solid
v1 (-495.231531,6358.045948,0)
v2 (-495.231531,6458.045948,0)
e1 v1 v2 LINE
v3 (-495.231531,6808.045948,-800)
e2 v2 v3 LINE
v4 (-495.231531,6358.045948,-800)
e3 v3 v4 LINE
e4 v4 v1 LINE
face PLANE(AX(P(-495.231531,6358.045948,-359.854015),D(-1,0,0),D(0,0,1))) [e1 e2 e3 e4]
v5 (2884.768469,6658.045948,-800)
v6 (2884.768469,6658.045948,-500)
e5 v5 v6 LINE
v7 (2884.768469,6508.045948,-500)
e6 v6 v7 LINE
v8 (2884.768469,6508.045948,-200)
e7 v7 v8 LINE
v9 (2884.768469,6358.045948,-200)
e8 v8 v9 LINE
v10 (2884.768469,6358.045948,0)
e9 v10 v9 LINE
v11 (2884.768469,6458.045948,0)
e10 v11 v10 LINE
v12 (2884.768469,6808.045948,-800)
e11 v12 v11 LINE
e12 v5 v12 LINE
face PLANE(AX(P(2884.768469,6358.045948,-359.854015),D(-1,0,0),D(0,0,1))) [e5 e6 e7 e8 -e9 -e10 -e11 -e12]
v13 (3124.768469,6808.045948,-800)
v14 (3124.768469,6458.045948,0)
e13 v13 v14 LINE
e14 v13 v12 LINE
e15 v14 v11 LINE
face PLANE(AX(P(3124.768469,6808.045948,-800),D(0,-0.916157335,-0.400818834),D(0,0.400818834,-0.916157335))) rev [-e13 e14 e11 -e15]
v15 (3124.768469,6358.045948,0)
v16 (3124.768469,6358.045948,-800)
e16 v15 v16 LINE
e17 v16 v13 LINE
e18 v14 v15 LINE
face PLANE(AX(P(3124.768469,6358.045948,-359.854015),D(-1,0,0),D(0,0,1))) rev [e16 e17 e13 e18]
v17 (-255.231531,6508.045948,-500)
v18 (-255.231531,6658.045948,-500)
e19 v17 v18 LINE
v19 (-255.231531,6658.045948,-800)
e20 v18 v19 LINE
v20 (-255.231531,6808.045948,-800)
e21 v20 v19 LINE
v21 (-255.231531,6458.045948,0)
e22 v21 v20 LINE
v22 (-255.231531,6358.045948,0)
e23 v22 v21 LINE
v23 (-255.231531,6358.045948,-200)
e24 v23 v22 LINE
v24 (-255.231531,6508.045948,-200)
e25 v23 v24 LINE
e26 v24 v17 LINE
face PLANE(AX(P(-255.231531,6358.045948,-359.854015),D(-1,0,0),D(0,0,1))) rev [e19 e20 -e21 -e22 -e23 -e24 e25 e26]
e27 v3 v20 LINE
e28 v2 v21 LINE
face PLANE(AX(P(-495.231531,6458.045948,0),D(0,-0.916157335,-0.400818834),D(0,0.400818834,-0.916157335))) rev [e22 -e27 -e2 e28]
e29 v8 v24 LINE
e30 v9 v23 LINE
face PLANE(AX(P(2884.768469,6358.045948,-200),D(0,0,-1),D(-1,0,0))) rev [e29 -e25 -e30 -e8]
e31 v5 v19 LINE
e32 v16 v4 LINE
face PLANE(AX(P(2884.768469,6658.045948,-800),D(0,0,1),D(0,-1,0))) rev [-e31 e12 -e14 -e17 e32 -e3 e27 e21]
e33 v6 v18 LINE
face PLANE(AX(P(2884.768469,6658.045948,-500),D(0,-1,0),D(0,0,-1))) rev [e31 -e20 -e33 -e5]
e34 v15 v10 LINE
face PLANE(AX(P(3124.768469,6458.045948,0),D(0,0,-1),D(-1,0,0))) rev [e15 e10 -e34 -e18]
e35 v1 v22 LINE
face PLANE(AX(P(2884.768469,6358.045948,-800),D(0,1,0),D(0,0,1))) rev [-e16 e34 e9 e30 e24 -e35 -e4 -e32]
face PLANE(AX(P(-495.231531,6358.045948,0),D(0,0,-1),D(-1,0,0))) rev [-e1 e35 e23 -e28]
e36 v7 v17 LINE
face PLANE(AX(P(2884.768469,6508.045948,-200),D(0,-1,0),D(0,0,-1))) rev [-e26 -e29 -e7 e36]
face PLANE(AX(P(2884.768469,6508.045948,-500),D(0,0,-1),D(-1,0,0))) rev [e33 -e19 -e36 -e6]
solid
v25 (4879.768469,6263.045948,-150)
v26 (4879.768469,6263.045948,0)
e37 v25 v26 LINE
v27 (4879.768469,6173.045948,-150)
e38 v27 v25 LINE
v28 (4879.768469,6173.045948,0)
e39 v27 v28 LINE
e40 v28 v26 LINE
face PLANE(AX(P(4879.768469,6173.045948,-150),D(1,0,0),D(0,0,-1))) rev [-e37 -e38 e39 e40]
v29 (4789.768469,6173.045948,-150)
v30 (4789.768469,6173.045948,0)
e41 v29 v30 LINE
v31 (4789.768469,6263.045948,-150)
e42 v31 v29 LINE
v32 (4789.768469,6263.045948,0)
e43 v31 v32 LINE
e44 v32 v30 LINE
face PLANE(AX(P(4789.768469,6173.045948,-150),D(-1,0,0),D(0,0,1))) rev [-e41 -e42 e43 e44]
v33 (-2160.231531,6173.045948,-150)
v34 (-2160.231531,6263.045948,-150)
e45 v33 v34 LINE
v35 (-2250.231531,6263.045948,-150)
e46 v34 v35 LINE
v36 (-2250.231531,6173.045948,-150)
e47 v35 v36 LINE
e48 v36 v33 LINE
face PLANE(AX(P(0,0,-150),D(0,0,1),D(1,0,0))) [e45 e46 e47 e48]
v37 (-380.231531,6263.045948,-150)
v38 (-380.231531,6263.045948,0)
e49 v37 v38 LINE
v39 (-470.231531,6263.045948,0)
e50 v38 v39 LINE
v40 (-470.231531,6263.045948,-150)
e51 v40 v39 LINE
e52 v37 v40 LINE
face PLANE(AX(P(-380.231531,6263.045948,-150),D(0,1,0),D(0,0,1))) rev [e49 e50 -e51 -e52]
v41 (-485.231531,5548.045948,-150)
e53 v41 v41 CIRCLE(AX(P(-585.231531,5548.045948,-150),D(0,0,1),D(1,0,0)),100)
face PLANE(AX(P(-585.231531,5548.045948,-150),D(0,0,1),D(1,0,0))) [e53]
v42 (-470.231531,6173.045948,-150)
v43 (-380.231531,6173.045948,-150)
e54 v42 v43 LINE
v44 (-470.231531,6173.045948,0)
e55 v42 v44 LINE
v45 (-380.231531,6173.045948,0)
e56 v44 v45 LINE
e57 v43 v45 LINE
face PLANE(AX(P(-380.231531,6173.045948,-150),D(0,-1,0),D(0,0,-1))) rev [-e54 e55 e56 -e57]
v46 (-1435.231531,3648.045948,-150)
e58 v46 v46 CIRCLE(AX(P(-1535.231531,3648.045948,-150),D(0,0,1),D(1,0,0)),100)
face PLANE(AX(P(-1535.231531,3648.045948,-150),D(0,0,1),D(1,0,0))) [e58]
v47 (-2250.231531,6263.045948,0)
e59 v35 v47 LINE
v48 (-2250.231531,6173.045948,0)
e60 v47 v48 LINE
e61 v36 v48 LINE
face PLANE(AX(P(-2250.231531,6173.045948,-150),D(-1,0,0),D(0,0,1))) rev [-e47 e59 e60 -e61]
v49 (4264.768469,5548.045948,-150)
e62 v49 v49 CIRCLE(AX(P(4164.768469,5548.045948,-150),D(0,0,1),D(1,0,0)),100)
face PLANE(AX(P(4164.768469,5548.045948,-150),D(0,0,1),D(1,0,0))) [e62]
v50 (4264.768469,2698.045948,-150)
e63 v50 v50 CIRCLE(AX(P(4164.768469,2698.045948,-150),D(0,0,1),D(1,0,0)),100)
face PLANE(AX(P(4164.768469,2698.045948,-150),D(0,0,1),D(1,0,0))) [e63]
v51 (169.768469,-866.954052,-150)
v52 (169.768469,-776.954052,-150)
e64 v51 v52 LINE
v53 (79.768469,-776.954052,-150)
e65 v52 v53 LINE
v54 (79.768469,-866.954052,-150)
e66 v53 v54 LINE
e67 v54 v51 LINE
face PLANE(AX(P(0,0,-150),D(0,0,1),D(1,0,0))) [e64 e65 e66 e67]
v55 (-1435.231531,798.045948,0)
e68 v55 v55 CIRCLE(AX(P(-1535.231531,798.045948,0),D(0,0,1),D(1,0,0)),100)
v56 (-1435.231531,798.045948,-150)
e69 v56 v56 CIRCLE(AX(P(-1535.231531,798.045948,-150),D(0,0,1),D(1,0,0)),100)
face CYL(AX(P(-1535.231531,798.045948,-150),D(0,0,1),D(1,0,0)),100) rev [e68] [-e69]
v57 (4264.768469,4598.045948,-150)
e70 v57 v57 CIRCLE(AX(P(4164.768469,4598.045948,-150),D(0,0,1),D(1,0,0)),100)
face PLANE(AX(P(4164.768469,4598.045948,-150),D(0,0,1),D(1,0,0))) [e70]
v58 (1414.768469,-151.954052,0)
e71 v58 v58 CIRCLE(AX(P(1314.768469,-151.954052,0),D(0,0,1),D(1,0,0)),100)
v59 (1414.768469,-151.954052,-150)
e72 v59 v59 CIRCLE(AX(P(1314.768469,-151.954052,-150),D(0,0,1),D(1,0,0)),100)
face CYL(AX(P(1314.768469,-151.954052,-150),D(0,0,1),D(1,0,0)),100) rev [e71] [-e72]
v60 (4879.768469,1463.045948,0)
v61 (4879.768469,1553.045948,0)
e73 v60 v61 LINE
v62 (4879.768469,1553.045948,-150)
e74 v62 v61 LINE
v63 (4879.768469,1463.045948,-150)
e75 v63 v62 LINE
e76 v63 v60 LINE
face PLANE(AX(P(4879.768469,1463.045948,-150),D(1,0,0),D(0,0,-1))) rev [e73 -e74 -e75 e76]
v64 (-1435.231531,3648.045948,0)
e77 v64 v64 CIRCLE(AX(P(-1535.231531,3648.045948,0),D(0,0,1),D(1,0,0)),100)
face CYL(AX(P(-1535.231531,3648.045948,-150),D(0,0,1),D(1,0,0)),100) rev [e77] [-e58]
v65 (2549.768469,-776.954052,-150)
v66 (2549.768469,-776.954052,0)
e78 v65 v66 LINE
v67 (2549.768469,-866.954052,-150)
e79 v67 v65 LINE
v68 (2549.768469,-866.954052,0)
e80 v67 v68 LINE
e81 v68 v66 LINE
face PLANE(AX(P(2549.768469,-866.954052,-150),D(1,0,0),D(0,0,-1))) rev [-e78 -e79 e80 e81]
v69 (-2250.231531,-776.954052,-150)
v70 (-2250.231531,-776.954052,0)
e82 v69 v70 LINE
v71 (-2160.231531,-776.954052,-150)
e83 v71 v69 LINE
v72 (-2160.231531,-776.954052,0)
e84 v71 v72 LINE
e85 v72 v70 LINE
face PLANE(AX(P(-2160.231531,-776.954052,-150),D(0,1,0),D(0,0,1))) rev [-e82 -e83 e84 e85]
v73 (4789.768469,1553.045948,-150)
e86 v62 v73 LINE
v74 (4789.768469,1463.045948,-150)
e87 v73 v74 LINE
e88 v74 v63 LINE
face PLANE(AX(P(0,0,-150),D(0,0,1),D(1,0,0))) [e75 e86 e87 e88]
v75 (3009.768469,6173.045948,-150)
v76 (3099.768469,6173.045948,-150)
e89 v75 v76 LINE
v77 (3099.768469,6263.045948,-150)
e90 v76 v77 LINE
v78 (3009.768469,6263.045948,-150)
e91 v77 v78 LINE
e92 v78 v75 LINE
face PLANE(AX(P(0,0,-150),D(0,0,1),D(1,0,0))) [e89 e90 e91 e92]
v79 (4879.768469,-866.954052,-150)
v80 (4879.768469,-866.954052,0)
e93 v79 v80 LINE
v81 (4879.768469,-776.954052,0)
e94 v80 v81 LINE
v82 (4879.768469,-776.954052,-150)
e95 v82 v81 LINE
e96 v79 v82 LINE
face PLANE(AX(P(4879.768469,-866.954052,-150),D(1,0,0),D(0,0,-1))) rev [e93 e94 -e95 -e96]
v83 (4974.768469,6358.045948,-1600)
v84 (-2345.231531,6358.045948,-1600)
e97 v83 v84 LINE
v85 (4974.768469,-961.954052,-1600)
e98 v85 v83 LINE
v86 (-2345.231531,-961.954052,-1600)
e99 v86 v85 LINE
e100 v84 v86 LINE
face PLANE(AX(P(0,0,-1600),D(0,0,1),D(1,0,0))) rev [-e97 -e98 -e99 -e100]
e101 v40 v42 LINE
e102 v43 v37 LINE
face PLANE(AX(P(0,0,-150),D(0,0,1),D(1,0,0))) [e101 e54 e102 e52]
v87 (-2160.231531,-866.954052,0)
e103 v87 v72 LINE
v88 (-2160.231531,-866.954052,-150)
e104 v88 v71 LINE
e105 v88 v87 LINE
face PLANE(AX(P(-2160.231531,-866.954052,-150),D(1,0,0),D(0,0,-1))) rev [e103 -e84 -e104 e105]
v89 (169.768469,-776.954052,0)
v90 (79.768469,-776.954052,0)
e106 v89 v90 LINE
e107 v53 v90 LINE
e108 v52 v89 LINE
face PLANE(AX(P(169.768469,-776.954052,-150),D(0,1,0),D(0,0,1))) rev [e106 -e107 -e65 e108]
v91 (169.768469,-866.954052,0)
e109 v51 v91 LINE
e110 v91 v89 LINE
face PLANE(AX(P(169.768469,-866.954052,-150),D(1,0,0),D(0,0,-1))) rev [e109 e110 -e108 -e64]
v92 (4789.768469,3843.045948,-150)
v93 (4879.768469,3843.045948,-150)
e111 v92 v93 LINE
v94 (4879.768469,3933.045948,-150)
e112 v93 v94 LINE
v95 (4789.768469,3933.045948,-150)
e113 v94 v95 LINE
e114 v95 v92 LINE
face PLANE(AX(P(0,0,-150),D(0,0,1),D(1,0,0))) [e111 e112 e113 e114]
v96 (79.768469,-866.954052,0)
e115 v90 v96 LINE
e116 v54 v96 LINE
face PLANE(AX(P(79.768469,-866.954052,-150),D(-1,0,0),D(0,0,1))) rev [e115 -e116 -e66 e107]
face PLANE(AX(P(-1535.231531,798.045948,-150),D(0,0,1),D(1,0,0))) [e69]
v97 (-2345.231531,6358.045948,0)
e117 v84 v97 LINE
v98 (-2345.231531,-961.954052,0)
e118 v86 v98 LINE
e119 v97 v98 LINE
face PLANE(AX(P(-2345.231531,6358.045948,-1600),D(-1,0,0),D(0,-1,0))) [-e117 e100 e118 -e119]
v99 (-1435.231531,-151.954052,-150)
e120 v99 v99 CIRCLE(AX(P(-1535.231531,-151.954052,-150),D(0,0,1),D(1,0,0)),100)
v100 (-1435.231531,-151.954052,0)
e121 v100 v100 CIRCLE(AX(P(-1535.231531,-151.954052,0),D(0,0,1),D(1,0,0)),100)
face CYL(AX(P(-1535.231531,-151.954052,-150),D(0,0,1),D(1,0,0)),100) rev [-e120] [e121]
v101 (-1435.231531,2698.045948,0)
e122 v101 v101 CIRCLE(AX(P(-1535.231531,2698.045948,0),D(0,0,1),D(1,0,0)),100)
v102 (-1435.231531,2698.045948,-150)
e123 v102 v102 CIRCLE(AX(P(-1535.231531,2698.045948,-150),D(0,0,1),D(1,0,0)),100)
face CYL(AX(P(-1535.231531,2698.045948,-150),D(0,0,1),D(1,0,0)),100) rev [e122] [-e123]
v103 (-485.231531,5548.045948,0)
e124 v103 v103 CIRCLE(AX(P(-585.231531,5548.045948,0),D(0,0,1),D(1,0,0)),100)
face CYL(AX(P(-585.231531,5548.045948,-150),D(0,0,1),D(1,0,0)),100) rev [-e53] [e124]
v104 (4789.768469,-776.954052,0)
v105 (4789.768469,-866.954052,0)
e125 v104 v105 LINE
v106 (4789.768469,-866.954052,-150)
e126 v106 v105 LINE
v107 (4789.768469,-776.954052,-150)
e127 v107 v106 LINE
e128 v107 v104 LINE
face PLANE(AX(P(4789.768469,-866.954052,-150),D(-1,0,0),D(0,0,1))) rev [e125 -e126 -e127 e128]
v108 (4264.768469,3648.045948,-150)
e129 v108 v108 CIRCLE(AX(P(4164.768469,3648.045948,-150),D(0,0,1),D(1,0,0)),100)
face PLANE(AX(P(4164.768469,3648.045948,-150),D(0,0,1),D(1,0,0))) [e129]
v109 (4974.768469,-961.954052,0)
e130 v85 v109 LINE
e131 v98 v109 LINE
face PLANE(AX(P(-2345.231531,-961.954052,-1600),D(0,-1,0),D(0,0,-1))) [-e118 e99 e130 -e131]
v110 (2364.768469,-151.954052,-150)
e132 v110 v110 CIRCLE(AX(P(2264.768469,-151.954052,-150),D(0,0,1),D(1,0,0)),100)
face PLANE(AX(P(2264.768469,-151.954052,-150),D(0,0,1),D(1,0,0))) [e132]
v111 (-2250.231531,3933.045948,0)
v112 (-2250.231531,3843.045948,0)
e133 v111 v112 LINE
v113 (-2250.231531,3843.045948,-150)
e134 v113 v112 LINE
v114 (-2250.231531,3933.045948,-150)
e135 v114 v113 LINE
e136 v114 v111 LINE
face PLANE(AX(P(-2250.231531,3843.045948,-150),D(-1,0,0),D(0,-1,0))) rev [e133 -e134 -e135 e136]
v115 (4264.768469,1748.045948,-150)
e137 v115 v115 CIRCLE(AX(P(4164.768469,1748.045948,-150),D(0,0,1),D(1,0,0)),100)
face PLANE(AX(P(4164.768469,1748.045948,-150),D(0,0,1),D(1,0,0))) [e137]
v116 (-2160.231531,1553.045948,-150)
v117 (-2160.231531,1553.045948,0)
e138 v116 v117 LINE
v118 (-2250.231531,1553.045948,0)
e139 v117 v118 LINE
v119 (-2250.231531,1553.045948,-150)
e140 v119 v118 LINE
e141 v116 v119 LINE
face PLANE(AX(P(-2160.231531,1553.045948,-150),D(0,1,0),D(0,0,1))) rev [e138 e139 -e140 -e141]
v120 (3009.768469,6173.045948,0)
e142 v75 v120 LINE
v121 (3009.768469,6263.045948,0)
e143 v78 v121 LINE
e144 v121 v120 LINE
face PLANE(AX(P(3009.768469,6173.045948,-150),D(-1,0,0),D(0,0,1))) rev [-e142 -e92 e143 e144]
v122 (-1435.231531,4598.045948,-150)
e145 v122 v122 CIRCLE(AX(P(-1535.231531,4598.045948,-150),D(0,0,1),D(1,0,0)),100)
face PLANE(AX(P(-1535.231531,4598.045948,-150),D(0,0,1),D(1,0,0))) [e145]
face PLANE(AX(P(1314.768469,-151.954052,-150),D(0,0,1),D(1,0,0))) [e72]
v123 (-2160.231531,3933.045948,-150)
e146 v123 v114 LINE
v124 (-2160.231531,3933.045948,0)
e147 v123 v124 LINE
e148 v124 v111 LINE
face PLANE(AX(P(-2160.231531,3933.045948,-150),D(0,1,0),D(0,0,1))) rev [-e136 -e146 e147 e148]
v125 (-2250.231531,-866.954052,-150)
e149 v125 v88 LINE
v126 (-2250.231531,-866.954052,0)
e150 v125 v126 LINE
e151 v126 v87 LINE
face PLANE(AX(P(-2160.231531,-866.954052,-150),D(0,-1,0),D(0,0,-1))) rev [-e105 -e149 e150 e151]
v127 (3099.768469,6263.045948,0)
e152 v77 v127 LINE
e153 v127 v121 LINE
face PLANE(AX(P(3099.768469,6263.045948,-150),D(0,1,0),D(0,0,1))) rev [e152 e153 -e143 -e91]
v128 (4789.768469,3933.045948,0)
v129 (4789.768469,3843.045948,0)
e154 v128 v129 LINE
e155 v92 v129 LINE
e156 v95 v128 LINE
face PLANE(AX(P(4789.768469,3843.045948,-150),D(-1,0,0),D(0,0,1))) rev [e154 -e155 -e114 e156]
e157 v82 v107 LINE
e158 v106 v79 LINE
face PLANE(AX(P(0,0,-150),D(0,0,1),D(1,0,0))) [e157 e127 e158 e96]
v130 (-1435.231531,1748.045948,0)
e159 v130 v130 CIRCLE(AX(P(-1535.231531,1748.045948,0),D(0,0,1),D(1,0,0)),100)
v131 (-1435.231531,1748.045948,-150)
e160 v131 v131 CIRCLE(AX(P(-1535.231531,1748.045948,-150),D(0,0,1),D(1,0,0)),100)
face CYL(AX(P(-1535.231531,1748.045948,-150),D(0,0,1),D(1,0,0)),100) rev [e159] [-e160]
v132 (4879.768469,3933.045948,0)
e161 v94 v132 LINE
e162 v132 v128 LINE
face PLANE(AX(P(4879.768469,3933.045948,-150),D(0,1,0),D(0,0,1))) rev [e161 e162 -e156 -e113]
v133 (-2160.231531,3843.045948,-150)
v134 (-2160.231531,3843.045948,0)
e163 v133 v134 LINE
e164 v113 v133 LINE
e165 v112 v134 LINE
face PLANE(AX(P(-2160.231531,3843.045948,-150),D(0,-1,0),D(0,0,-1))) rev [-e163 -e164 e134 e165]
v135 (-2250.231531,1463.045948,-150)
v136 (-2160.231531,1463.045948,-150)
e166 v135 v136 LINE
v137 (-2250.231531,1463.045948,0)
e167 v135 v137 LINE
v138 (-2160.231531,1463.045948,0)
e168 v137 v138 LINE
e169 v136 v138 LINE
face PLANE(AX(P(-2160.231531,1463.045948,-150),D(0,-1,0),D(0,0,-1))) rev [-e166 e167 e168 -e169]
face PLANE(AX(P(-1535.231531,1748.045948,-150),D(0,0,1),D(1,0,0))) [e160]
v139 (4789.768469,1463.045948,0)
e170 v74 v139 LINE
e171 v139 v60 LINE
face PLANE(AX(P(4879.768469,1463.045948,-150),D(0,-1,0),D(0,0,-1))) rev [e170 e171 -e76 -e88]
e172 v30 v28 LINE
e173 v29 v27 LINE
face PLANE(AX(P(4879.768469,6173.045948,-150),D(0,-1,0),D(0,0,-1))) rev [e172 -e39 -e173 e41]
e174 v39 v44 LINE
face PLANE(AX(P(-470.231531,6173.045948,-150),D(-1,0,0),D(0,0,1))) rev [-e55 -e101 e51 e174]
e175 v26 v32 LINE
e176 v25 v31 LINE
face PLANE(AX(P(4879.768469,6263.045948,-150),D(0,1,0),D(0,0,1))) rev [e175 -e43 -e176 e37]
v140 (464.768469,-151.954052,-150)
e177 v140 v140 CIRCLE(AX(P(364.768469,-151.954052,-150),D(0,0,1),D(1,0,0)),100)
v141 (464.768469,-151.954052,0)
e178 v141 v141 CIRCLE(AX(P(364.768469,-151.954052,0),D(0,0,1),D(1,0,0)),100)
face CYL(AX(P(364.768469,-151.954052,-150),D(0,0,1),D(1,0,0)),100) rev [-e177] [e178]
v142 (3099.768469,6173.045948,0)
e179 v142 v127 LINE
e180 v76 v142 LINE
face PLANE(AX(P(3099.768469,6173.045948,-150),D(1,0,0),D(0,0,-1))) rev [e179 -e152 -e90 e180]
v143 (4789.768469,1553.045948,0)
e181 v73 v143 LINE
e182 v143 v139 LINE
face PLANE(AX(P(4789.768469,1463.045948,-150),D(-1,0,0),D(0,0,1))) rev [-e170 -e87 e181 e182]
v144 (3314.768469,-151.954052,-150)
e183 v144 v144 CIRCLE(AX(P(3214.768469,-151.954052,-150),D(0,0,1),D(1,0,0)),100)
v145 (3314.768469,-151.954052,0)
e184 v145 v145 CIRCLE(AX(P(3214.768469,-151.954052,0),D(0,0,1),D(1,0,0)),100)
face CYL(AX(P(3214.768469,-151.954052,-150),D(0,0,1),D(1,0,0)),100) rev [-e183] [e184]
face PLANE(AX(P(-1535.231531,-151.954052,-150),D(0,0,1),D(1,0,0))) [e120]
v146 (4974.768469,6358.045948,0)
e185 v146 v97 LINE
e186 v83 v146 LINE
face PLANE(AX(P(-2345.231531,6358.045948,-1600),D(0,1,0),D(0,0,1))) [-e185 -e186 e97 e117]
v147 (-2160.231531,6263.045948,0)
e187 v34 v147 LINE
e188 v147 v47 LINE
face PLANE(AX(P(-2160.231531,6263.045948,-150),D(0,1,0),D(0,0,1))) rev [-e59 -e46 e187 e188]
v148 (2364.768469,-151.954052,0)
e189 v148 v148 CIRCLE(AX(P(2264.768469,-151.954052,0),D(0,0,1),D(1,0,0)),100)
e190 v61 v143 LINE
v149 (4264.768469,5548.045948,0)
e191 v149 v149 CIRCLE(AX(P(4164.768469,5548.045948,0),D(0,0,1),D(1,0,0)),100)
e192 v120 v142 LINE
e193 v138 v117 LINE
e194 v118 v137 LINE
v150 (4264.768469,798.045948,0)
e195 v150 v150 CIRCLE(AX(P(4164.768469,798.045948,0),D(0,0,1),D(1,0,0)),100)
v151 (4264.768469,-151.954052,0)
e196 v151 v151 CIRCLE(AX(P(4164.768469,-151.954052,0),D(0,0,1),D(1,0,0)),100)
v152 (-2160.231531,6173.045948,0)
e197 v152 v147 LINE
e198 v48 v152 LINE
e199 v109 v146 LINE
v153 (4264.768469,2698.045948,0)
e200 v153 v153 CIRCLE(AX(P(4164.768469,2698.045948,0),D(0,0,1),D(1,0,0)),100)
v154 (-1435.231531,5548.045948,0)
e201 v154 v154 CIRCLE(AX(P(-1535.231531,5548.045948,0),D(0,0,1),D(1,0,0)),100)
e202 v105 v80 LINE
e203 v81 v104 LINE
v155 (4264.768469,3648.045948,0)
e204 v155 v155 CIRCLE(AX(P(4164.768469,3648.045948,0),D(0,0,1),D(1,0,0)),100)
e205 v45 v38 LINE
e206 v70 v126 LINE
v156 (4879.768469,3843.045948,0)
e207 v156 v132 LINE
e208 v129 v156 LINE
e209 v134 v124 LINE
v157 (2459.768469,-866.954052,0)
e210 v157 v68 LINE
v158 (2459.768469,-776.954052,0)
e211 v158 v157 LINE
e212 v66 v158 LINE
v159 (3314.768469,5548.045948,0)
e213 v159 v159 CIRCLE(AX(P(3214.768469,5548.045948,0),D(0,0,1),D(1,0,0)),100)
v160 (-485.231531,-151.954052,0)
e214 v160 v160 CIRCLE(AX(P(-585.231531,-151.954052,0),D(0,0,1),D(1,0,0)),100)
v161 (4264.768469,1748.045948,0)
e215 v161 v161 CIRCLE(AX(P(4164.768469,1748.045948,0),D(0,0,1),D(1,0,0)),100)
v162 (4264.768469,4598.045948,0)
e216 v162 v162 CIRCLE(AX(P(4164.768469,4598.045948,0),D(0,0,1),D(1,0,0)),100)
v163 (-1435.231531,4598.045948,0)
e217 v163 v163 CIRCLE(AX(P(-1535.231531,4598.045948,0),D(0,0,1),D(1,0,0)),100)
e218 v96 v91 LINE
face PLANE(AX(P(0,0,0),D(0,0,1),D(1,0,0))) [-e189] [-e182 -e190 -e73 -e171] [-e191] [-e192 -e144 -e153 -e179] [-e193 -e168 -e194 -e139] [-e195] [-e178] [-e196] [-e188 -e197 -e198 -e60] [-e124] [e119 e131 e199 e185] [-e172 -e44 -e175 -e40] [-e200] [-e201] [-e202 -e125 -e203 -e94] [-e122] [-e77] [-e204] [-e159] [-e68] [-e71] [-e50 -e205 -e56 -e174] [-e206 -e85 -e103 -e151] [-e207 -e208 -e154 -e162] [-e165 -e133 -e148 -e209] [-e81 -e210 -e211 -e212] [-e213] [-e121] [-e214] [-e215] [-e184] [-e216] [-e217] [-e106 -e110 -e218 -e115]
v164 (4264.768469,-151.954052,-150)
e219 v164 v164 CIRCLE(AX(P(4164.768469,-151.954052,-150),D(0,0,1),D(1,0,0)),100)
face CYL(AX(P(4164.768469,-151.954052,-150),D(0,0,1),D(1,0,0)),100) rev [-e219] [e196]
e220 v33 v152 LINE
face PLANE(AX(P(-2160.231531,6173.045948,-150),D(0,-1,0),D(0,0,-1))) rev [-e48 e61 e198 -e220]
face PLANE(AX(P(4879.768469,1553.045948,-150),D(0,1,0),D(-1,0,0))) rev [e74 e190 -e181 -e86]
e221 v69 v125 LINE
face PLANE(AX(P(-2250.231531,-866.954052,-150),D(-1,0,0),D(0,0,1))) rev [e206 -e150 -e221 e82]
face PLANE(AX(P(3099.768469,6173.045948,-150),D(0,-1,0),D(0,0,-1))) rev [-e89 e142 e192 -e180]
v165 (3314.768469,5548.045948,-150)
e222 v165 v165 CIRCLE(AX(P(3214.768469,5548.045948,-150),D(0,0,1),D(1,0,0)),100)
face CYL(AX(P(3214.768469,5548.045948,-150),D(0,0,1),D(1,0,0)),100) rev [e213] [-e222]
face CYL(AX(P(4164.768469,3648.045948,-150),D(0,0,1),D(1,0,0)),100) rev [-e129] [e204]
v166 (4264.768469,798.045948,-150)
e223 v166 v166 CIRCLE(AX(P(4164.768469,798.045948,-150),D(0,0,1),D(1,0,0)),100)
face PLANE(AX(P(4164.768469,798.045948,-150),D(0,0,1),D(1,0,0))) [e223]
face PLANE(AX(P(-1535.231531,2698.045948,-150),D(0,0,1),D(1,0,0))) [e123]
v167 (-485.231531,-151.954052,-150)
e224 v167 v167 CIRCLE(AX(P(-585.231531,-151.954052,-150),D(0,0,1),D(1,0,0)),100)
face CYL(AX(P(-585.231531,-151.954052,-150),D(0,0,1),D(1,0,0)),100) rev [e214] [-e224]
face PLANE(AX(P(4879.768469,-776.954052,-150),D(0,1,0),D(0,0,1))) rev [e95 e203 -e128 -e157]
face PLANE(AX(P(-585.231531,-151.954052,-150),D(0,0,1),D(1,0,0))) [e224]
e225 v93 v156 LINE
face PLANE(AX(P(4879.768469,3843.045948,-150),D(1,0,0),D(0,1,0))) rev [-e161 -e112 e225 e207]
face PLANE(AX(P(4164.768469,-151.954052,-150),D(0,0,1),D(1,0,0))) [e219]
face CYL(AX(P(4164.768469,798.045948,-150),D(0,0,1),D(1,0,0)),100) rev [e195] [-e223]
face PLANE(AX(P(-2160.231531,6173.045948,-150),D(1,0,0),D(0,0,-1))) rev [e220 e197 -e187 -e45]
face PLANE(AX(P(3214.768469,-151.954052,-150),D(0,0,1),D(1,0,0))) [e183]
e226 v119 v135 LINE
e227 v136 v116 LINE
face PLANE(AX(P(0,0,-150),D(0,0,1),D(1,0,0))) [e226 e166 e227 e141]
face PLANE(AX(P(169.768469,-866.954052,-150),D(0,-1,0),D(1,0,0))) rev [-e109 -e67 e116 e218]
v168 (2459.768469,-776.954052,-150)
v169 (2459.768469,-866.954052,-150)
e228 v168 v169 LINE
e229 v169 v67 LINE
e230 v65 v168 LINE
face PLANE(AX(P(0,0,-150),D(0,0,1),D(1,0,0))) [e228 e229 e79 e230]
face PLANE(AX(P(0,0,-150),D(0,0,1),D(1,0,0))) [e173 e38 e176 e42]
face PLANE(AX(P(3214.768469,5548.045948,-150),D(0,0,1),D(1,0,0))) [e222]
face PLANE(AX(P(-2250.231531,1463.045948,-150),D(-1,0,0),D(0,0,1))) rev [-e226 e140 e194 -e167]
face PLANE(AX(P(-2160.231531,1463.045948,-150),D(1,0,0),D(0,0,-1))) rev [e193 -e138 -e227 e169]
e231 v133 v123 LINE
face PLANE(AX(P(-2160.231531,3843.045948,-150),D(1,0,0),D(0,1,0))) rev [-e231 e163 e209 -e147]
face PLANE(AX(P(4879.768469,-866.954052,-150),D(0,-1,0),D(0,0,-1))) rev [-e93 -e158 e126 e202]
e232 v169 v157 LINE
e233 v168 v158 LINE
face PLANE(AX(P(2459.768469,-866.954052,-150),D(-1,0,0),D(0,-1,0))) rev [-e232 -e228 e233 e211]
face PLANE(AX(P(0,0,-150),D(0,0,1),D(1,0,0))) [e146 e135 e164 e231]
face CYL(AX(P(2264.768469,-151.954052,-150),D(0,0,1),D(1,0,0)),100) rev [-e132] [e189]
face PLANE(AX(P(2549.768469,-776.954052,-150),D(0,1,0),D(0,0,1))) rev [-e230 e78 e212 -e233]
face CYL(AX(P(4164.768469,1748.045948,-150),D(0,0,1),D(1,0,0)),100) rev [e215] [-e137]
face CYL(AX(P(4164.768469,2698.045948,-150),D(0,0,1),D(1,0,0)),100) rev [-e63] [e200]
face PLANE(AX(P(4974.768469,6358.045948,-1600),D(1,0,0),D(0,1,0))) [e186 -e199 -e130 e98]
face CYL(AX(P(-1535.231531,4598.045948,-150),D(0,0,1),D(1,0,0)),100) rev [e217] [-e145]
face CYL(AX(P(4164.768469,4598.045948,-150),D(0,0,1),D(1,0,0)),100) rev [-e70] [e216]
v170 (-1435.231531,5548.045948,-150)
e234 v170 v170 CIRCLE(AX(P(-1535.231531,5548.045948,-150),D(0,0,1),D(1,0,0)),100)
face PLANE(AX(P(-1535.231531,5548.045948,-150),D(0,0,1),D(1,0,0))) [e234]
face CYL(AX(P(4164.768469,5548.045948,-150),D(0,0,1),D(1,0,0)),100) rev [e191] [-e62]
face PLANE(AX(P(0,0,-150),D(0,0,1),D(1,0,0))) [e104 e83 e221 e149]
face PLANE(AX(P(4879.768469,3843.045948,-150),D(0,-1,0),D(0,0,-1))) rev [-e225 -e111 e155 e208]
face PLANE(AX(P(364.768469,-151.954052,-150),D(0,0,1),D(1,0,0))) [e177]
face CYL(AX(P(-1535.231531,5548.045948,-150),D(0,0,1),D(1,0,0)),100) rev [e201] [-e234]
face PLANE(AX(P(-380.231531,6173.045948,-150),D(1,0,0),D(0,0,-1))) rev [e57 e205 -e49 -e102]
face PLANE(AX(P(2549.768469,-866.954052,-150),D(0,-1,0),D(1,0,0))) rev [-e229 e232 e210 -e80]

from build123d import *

# Parameters (mm, degrees)
SKETCH_1_W          = 7320
SKETCH_1_H          = 7320
EXTRUDE_1_DEPTH     = 1600
SKETCH_2_R          = 100
CUT_EXTRUDE_2_DEPTH = 150
OTHER_START         = -495.231530838
OTHER_3_DEPTH       = 3620
OTHER_3_2_DEPTH     = 240
OTHER_START_2       = 2884.768469162
OTHER_3_3_DEPTH     = 240
SKETCH_9_W          = 90
SKETCH_9_H          = 90
CUT_EXTRUDE_3_DEPTH = 150
SKETCH_10_R         = 100
CUT_EXTRUDE_4_DEPTH = 150


# Read off the part's stored shape, not the designer's step: 零件3
with BuildPart() as part:
    # 草图1 → 凸台-拉伸1 (new body)
    with BuildSketch(Plane.XY):
        with Locations((1314.768469162, 2698.045948238)):
            Rectangle(SKETCH_1_W, SKETCH_1_H)
    extrude(amount=-EXTRUDE_1_DEPTH)

    # 草图2 → 切除-拉伸2 (cut)
    with BuildSketch(Plane.XY):
        with Locations((-1535.231530838, 5548.045948238)):
            Circle(SKETCH_2_R)
        with Locations((4164.768469162, 5548.045948238)):
            Circle(SKETCH_2_R)
        with Locations((-1535.231530838, -151.954051762)):
            Circle(SKETCH_2_R)
        with Locations((4164.768469162, -151.954051762)):
            Circle(SKETCH_2_R)
    extrude(amount=-CUT_EXTRUDE_2_DEPTH, mode=Mode.SUBTRACT)

    # 草图9 → 切除-拉伸3 (cut)
    with BuildSketch(Plane.XY):
        with Locations((-2205.231530838, 6218.045948238)):
            Rectangle(SKETCH_9_W, SKETCH_9_H)
        with Locations((-2205.231530838, 3888.045948238)):
            Rectangle(SKETCH_9_W, SKETCH_9_H)
        with Locations((-2205.231530838, 1508.045948238)):
            Rectangle(SKETCH_9_W, SKETCH_9_H)
        with Locations((-2205.231530838, -821.954051762)):
            Rectangle(SKETCH_9_W, SKETCH_9_H)
        with Locations((124.768469162, -821.954051762)):
            Rectangle(SKETCH_9_W, SKETCH_9_H)
        with Locations((2504.768469162, -821.954051762)):
            Rectangle(SKETCH_9_W, SKETCH_9_H)
        with Locations((4834.768469162, -821.954051762)):
            Rectangle(SKETCH_9_W, SKETCH_9_H)
        with Locations((4834.768469162, 1508.045948238)):
            Rectangle(SKETCH_9_W, SKETCH_9_H)
        with Locations((4834.768469162, 3888.045948238)):
            Rectangle(SKETCH_9_W, SKETCH_9_H)
        with Locations((4834.768469162, 6218.045948238)):
            Rectangle(SKETCH_9_W, SKETCH_9_H)
        with Locations((3054.768469162, 6218.045948238)):
            Rectangle(SKETCH_9_W, SKETCH_9_H)
        with Locations((-425.231530838, 6218.045948238)):
            Rectangle(SKETCH_9_W, SKETCH_9_H)
    extrude(amount=-CUT_EXTRUDE_3_DEPTH, mode=Mode.SUBTRACT)

    # 草图10 → 切除-拉伸4 (cut)
    with BuildSketch(Plane.XY):
        with Locations((-585.231530838, 5548.045948238)):
            Circle(SKETCH_10_R)
        with Locations((-1535.231530838, 3648.045948238)):
            Circle(SKETCH_10_R)
        with Locations((-1535.231530838, 1748.045948238)):
            Circle(SKETCH_10_R)
        with Locations((4164.768469162, 3648.045948238)):
            Circle(SKETCH_10_R)
        with Locations((4164.768469162, 1748.045948238)):
            Circle(SKETCH_10_R)
        with Locations((3214.768469162, 5548.045948238)):
            Circle(SKETCH_10_R)
        with Locations((-1535.231530838, 4598.045948238)):
            Circle(SKETCH_10_R)
        with Locations((-1535.231530838, 2698.045948238)):
            Circle(SKETCH_10_R)
        with Locations((-1535.231530838, 798.045948238)):
            Circle(SKETCH_10_R)
        with Locations((4164.768469162, 4598.045948238)):
            Circle(SKETCH_10_R)
        with Locations((4164.768469162, 2698.045948238)):
            Circle(SKETCH_10_R)
        with Locations((4164.768469162, 798.045948238)):
            Circle(SKETCH_10_R)
        with Locations((-585.231530838, -151.954051762)):
            Circle(SKETCH_10_R)
        with Locations((364.768469162, -151.954051762)):
            Circle(SKETCH_10_R)
        with Locations((1314.768469162, -151.954051762)):
            Circle(SKETCH_10_R)
        with Locations((2264.768469162, -151.954051762)):
            Circle(SKETCH_10_R)
        with Locations((3214.768469162, -151.954051762)):
            Circle(SKETCH_10_R)
    extrude(amount=-CUT_EXTRUDE_4_DEPTH, mode=Mode.SUBTRACT)


with BuildPart() as body_2:
    # Other 3 outline → Other 3 (new body)
    with BuildSketch(Plane.YZ.offset(OTHER_START)):
        Polygon((6658.045948238, -800), (6658.045948238, -500), (6508.045948238, -500), (6508.045948238, -200), (6358.045948238, -200), (6358.045948238, -800), align=None)
    extrude(amount=OTHER_3_DEPTH)

    # Other 3 2 outline → Other 3 2 (add)
    with BuildSketch(Plane.YZ.offset(OTHER_START)):
        Polygon((6508.045948238, -500), (6658.045948238, -500), (6658.045948238, -800), (6808.045948238, -800), (6458.045948238, 0), (6358.045948238, 0), (6358.045948238, -200), (6508.045948238, -200), align=None)
    extrude(amount=OTHER_3_2_DEPTH)

    # Other 3 3 outline → Other 3 3 (add)
    with BuildSketch(Plane.YZ.offset(OTHER_START_2)):
        Polygon((6508.045948238, -500), (6658.045948238, -500), (6658.045948238, -800), (6808.045948238, -800), (6458.045948238, 0), (6358.045948238, 0), (6358.045948238, -200), (6508.045948238, -200), align=None)
    extrude(amount=OTHER_3_3_DEPTH)


solid = Compound([part.part, body_2.part])
